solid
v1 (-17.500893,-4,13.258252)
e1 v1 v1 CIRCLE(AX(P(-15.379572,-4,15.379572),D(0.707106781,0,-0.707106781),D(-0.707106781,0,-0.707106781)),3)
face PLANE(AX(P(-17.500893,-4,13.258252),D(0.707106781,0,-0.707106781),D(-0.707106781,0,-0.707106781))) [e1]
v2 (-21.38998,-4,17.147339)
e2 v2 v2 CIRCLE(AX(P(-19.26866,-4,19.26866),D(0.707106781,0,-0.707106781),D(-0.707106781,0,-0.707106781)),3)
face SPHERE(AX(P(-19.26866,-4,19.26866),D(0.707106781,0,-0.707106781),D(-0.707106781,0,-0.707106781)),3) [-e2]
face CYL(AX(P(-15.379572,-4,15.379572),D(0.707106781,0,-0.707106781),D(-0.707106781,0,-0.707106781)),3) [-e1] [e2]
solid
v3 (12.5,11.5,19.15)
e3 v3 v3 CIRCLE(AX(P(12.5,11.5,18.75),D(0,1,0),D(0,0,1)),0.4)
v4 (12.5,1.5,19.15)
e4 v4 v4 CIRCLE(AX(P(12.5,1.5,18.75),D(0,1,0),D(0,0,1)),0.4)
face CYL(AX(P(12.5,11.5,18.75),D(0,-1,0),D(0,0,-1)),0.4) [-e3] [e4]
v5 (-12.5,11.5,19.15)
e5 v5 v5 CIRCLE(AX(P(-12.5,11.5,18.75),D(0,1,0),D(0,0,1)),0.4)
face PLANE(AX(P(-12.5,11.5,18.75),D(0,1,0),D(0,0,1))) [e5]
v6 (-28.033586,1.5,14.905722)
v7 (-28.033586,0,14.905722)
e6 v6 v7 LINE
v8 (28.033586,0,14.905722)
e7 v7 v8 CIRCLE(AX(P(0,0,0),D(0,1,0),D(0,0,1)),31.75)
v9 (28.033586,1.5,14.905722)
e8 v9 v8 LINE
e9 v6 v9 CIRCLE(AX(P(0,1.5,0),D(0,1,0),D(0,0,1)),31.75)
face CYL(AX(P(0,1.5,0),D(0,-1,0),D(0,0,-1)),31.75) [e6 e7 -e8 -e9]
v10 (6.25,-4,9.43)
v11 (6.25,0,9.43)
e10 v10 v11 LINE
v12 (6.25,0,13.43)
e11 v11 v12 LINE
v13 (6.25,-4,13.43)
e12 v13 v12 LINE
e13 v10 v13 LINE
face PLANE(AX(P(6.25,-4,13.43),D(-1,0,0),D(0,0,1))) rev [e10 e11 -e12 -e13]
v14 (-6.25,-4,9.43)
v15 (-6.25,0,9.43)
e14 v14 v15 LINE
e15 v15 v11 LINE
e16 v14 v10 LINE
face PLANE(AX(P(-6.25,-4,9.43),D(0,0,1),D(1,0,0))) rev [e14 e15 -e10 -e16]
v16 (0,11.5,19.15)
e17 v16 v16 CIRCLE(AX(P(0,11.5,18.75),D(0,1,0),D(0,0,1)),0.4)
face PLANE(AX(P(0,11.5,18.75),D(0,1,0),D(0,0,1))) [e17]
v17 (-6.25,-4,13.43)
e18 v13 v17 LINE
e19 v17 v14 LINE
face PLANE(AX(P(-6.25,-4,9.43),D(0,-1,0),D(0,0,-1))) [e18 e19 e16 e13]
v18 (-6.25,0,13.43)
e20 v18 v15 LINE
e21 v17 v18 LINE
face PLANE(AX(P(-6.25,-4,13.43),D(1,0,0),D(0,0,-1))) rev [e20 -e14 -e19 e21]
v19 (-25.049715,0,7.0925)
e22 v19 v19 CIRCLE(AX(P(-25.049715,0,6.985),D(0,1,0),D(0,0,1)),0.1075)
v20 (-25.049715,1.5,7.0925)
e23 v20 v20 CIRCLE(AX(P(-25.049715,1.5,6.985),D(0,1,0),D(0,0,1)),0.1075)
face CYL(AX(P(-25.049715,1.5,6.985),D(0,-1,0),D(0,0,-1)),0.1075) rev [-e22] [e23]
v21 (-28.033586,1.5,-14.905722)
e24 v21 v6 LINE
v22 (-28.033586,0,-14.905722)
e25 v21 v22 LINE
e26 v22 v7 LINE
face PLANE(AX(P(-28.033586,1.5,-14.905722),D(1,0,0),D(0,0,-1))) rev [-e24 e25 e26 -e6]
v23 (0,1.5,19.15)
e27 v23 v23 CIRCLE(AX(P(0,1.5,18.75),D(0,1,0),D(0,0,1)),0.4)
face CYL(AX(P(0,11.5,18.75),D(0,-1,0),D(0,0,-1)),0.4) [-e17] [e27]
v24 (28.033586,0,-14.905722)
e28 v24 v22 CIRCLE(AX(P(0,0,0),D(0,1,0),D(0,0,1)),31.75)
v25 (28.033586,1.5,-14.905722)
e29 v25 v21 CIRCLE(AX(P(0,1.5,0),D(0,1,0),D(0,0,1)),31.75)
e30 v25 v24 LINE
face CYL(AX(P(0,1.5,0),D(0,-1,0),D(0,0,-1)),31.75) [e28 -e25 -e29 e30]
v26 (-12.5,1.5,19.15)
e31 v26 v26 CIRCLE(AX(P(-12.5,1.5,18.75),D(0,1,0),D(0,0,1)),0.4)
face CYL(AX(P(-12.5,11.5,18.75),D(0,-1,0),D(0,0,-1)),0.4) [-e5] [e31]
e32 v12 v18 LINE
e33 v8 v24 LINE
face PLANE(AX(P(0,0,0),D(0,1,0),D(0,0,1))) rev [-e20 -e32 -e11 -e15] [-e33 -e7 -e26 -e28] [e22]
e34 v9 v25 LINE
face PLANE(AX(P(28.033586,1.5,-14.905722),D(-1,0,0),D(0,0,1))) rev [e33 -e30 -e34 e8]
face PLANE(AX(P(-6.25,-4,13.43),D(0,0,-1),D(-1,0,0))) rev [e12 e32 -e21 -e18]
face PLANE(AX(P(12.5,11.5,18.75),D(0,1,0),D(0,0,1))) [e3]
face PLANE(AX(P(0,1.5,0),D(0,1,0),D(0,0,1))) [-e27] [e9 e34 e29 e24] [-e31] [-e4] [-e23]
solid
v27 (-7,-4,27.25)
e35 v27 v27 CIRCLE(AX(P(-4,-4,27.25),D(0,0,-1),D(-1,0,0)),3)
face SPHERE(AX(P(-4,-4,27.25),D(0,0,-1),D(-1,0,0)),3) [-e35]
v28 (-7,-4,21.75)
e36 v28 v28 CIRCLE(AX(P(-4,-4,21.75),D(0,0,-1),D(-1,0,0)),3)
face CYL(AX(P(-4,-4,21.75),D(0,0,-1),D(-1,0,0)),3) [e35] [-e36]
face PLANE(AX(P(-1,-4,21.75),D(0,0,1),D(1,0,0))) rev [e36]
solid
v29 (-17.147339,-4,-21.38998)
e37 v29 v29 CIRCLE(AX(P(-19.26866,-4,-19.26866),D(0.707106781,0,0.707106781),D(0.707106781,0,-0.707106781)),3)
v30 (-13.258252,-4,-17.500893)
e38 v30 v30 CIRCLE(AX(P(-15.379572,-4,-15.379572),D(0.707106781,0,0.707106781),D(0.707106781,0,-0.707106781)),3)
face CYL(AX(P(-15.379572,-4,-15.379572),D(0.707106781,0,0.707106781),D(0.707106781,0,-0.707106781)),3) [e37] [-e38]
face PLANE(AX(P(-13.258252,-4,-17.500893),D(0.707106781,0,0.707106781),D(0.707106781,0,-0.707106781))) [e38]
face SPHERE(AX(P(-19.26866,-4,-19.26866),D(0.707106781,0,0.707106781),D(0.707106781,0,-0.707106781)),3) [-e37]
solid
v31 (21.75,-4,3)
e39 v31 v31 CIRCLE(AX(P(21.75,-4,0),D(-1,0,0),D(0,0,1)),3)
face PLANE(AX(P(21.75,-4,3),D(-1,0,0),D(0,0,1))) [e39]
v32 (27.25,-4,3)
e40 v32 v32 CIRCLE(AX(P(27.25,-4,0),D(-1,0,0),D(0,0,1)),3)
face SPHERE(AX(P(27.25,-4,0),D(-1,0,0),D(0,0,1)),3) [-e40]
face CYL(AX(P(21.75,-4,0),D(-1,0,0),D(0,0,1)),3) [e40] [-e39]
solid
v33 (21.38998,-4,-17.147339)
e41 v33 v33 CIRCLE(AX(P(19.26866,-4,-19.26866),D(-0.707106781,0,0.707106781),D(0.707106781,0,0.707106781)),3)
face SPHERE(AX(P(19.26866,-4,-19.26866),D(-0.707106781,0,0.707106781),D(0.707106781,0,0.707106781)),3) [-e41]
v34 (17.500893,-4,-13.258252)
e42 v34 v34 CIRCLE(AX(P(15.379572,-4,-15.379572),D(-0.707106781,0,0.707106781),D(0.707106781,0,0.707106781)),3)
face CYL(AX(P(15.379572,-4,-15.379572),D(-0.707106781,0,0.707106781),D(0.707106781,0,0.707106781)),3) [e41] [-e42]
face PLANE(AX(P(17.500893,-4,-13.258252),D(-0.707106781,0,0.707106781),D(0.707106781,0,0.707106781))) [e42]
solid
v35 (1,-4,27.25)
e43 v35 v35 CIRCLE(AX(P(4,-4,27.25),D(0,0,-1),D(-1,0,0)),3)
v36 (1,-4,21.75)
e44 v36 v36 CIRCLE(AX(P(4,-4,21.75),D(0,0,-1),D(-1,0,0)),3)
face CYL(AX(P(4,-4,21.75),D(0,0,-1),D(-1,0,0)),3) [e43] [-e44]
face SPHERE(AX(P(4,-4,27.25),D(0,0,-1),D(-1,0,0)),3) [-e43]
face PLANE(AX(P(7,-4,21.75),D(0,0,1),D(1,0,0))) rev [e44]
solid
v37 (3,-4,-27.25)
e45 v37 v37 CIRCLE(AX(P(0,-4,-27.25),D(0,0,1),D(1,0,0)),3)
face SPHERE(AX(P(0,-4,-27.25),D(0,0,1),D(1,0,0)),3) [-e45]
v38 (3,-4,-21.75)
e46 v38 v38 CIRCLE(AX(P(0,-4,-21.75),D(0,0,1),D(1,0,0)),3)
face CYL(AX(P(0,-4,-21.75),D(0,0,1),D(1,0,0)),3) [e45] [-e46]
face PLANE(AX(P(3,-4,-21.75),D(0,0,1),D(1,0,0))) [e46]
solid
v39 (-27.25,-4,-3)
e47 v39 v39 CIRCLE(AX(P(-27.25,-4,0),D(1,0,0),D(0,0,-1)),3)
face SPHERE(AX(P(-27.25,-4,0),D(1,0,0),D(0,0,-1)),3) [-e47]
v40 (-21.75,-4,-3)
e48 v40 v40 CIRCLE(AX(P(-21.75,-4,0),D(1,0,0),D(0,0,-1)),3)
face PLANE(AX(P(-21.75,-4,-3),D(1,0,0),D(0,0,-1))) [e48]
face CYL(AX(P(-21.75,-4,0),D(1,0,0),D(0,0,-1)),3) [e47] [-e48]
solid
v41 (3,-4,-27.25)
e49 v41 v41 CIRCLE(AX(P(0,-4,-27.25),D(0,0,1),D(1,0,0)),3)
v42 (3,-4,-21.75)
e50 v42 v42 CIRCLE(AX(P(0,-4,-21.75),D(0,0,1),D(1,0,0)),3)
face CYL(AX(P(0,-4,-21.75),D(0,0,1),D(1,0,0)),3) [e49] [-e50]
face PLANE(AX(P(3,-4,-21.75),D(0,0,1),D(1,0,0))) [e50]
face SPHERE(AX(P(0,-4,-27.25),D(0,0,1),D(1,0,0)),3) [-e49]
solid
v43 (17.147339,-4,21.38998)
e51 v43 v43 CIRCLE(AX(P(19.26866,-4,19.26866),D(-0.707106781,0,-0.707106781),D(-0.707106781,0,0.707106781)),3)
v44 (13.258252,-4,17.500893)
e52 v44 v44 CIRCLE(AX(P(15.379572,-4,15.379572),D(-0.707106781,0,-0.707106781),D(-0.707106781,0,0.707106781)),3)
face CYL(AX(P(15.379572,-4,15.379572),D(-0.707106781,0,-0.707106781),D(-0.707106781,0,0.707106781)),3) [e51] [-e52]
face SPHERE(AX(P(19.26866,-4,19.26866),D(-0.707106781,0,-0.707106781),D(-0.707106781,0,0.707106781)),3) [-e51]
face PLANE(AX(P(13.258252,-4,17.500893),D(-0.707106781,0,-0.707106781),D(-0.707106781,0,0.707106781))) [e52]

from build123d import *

# Parameters (mm, degrees)
SKETCH1_R        = 0.1075
BASE_DEPTH       = 1.5
SKETCH2_W        = 12.5
SKETCH2_H        = 4
MOTOR_BOX_DEPTH  = 4
FRONT_LEDS_COUNT = 2
FRONT_LEDS_PITCH = 8
SKETCH7_R        = 0.4
ANTENNAE_DEPTH   = 10


with BuildPart() as part:
    # Sketch1 → Base (new body)
    with BuildSketch(Plane(origin=(0, 0, 0), x_dir=(1, 0, 0), z_dir=(0, 1, 0))):
        with BuildLine():
            Line((-28.033586073, 14.905722118), (-28.033586073, -14.905722118))
            ThreePointArc((-28.033586073, -14.905722118), (0, -31.75), (28.033586073, -14.905722118))
            Line((28.033586073, -14.905722118), (28.033586073, 14.905722118))
            ThreePointArc((28.033586073, 14.905722118), (0, 31.75), (-28.033586073, 14.905722118))
        make_face()
        with Locations(Location((-25.04971545, -6.985, 0), (0, 0, 270))):
            Circle(SKETCH1_R, mode=Mode.SUBTRACT)
    extrude(amount=BASE_DEPTH)

    # Sketch2 → Motor Box (add)
    with BuildSketch(Plane.XZ):
        with Locations((0, 11.43)):
            Rectangle(SKETCH2_W, SKETCH2_H)
    extrude(amount=MOTOR_BOX_DEPTH)

    # Sketch7 → Antennae (add)
    with BuildSketch(Plane(origin=(0, 1.5, 0), x_dir=(-1, 0, 0), z_dir=(0, 1, 0))):
        with Locations(Location((0, 18.75, 0), (0, 0, 90))):
            Circle(SKETCH7_R)
        with Locations(Location((-12.5, 18.75, 0), (0, 0, 90))):
            Circle(SKETCH7_R)
        with Locations(Location((12.5, 18.75, 0), (0, 0, 90))):
            Circle(SKETCH7_R)
    extrude(amount=ANTENNAE_DEPTH)


with BuildPart() as body_2:
    # Sketch4 → LED (revolve)
    with BuildSketch(Plane(origin=(0, -4, 0), x_dir=(-1, 0, 0), z_dir=(0, 1, 0))):
        with BuildLine():
            Line((0, -21.75), (0, -30.25))
            ThreePointArc((0, -30.25), (-2.121320344, -29.371320344), (-3, -27.25))
            Line((-3, -27.25), (-3, -21.75))
            Line((-3, -21.75), (0, -21.75))
        make_face()
    revolve(axis=Axis((0, -4, -21.75), (0, 0, -1)))


with BuildPart() as body_3:
    # LED Pattern: read off the stored shape, not the designer's step
    # LED Pattern outline → LED Pattern (revolve)
    with BuildSketch(Plane(origin=(0, -4, 0), x_dir=(0.707106781186556, 0, -0.707106781186539), z_dir=(0, -1, 0))):
        with BuildLine():
            Line((3, -21.75), (0, -21.75))
            Line((0, -21.75), (0, -30.25))
            ThreePointArc((0, -30.25), (2.121320345, -29.371320342), (3, -27.249999997))
            Line((3, -27.249999997), (3, -21.75))
        make_face()
    revolve(axis=Axis((0, -4, 0), (0.707106781186539, 0, 0.707106781186556)))


with BuildPart() as body_4:
    # LED Pattern 2 outline → LED Pattern 2 (revolve)
    with BuildSketch(Plane(origin=(0, -4, 0), x_dir=(0, 1, 0), z_dir=(0, 0, -1))):
        with BuildLine():
            Line((3, -21.75), (0, -21.75))
            Line((0, -21.75), (0, -30.25))
            ThreePointArc((0, -30.25), (2.121320345, -29.371320342), (3, -27.249999997))
            Line((3, -27.249999997), (3, -21.75))
        make_face()
    revolve(axis=Axis((0, -4, 0), (1, 0, 0)))


with BuildPart() as body_5:
    # LED Pattern 3 outline → LED Pattern 3 (revolve)
    with BuildSketch(Plane(origin=(0, -4, 0), x_dir=(0.707106781186541, 0, 0.707106781186554), z_dir=(0, 1, 0))):
        with BuildLine():
            Line((3, -21.75), (0, -21.75))
            Line((0, -21.75), (0, -30.25))
            ThreePointArc((0, -30.25), (2.121320345, -29.371320342), (3, -27.249999997))
            Line((3, -27.249999997), (3, -21.75))
        make_face()
    revolve(axis=Axis((0, -4, 0), (0.707106781186554, 0, -0.707106781186541)))


with BuildPart() as body_6:
    # LED Pattern 4 outline → LED Pattern 4 (revolve)
    with BuildSketch(Plane(origin=(0, -4, 0), x_dir=(0.7071067811865509, 0, -0.707106781186544), z_dir=(0, -1, 0))):
        with BuildLine():
            Line((0, 30.25), (0, 21.75))
            Line((0, 21.75), (3, 21.75))
            Line((3, 21.75), (3, 27.249999997))
            ThreePointArc((3, 27.249999997), (2.121320345, 29.371320342), (0, 30.25))
        make_face()
    revolve(axis=Axis((0, -4, 0), (0.707106781186544, 0, 0.7071067811865509)))


with BuildPart() as body_7:
    # LED Pattern 5 outline → LED Pattern 5 (revolve)
    with BuildSketch(Plane(origin=(0, -4, 0), x_dir=(0, 1, 0), z_dir=(0, 0, -1))):
        with BuildLine():
            Line((0, 30.25), (0, 21.75))
            Line((0, 21.75), (3, 21.75))
            Line((3, 21.75), (3, 27.249999997))
            ThreePointArc((3, 27.249999997), (2.121320345, 29.371320342), (0, 30.25))
        make_face()
    revolve(axis=Axis((0, -4, 0), (1, 0, 0)))


with BuildPart() as body_8:
    # LED Pattern 6 outline → LED Pattern 6 (revolve)
    with BuildSketch(Plane(origin=(0, -4, 0), x_dir=(0.707106781186546, 0, 0.707106781186549), z_dir=(0, 1, 0))):
        with BuildLine():
            Line((0, 30.25), (0, 21.75))
            Line((0, 21.75), (3, 21.75))
            Line((3, 21.75), (3, 27.249999997))
            ThreePointArc((3, 27.249999997), (2.121320345, 29.371320342), (0, 30.25))
        make_face()
    revolve(axis=Axis((0, -4, 0), (0.707106781186549, 0, -0.707106781186546)))


with BuildPart() as body_9:
    # LED Pattern 7 outline → LED Pattern 7 (revolve)
    with BuildSketch(Plane.XZ.offset(4)):
        with BuildLine():
            Line((3, -21.75), (0, -21.75))
            Line((0, -21.75), (0, -30.25))
            ThreePointArc((0, -30.25), (2.121320345, -29.371320342), (3, -27.249999997))
            Line((3, -27.249999997), (3, -21.75))
        make_face()
    revolve(axis=Axis((0, -4, 0), (0, 0, 1)))


with BuildPart() as body_10:
    # Sketch6 → Front LED (revolve)
    with BuildSketch(Plane(origin=(0, -4, 0), x_dir=(-1, 0, 0), z_dir=(0, 1, 0)), mode=Mode.PRIVATE) as front_led_sk:
        with BuildLine():
            Line((-4, 21.75), (-4, 30.25))
            ThreePointArc((-4, 30.25), (-6.121320344, 29.371320344), (-7, 27.25))
            Line((-7, 27.25), (-7, 21.75))
            Line((-7, 21.75), (-4, 21.75))
        make_face()
    revolve(front_led_sk.sketch.rotate(Axis((4, -4, 21.75), (0, 0, 1)), 180), axis=Axis((4, -4, 21.75), (0, 0, 1)))


with BuildPart() as front_leds_1:
    # Front LEDs: pattern copy
    add(body_10.part.moved(Location(Vector(-1, 0, 0) * (1 * FRONT_LEDS_PITCH))))


solid = Compound([part.part, body_2.part, body_3.part, body_4.part, body_5.part, body_6.part, body_7.part, body_8.part, body_9.part, body_10.part, front_leds_1.part])
